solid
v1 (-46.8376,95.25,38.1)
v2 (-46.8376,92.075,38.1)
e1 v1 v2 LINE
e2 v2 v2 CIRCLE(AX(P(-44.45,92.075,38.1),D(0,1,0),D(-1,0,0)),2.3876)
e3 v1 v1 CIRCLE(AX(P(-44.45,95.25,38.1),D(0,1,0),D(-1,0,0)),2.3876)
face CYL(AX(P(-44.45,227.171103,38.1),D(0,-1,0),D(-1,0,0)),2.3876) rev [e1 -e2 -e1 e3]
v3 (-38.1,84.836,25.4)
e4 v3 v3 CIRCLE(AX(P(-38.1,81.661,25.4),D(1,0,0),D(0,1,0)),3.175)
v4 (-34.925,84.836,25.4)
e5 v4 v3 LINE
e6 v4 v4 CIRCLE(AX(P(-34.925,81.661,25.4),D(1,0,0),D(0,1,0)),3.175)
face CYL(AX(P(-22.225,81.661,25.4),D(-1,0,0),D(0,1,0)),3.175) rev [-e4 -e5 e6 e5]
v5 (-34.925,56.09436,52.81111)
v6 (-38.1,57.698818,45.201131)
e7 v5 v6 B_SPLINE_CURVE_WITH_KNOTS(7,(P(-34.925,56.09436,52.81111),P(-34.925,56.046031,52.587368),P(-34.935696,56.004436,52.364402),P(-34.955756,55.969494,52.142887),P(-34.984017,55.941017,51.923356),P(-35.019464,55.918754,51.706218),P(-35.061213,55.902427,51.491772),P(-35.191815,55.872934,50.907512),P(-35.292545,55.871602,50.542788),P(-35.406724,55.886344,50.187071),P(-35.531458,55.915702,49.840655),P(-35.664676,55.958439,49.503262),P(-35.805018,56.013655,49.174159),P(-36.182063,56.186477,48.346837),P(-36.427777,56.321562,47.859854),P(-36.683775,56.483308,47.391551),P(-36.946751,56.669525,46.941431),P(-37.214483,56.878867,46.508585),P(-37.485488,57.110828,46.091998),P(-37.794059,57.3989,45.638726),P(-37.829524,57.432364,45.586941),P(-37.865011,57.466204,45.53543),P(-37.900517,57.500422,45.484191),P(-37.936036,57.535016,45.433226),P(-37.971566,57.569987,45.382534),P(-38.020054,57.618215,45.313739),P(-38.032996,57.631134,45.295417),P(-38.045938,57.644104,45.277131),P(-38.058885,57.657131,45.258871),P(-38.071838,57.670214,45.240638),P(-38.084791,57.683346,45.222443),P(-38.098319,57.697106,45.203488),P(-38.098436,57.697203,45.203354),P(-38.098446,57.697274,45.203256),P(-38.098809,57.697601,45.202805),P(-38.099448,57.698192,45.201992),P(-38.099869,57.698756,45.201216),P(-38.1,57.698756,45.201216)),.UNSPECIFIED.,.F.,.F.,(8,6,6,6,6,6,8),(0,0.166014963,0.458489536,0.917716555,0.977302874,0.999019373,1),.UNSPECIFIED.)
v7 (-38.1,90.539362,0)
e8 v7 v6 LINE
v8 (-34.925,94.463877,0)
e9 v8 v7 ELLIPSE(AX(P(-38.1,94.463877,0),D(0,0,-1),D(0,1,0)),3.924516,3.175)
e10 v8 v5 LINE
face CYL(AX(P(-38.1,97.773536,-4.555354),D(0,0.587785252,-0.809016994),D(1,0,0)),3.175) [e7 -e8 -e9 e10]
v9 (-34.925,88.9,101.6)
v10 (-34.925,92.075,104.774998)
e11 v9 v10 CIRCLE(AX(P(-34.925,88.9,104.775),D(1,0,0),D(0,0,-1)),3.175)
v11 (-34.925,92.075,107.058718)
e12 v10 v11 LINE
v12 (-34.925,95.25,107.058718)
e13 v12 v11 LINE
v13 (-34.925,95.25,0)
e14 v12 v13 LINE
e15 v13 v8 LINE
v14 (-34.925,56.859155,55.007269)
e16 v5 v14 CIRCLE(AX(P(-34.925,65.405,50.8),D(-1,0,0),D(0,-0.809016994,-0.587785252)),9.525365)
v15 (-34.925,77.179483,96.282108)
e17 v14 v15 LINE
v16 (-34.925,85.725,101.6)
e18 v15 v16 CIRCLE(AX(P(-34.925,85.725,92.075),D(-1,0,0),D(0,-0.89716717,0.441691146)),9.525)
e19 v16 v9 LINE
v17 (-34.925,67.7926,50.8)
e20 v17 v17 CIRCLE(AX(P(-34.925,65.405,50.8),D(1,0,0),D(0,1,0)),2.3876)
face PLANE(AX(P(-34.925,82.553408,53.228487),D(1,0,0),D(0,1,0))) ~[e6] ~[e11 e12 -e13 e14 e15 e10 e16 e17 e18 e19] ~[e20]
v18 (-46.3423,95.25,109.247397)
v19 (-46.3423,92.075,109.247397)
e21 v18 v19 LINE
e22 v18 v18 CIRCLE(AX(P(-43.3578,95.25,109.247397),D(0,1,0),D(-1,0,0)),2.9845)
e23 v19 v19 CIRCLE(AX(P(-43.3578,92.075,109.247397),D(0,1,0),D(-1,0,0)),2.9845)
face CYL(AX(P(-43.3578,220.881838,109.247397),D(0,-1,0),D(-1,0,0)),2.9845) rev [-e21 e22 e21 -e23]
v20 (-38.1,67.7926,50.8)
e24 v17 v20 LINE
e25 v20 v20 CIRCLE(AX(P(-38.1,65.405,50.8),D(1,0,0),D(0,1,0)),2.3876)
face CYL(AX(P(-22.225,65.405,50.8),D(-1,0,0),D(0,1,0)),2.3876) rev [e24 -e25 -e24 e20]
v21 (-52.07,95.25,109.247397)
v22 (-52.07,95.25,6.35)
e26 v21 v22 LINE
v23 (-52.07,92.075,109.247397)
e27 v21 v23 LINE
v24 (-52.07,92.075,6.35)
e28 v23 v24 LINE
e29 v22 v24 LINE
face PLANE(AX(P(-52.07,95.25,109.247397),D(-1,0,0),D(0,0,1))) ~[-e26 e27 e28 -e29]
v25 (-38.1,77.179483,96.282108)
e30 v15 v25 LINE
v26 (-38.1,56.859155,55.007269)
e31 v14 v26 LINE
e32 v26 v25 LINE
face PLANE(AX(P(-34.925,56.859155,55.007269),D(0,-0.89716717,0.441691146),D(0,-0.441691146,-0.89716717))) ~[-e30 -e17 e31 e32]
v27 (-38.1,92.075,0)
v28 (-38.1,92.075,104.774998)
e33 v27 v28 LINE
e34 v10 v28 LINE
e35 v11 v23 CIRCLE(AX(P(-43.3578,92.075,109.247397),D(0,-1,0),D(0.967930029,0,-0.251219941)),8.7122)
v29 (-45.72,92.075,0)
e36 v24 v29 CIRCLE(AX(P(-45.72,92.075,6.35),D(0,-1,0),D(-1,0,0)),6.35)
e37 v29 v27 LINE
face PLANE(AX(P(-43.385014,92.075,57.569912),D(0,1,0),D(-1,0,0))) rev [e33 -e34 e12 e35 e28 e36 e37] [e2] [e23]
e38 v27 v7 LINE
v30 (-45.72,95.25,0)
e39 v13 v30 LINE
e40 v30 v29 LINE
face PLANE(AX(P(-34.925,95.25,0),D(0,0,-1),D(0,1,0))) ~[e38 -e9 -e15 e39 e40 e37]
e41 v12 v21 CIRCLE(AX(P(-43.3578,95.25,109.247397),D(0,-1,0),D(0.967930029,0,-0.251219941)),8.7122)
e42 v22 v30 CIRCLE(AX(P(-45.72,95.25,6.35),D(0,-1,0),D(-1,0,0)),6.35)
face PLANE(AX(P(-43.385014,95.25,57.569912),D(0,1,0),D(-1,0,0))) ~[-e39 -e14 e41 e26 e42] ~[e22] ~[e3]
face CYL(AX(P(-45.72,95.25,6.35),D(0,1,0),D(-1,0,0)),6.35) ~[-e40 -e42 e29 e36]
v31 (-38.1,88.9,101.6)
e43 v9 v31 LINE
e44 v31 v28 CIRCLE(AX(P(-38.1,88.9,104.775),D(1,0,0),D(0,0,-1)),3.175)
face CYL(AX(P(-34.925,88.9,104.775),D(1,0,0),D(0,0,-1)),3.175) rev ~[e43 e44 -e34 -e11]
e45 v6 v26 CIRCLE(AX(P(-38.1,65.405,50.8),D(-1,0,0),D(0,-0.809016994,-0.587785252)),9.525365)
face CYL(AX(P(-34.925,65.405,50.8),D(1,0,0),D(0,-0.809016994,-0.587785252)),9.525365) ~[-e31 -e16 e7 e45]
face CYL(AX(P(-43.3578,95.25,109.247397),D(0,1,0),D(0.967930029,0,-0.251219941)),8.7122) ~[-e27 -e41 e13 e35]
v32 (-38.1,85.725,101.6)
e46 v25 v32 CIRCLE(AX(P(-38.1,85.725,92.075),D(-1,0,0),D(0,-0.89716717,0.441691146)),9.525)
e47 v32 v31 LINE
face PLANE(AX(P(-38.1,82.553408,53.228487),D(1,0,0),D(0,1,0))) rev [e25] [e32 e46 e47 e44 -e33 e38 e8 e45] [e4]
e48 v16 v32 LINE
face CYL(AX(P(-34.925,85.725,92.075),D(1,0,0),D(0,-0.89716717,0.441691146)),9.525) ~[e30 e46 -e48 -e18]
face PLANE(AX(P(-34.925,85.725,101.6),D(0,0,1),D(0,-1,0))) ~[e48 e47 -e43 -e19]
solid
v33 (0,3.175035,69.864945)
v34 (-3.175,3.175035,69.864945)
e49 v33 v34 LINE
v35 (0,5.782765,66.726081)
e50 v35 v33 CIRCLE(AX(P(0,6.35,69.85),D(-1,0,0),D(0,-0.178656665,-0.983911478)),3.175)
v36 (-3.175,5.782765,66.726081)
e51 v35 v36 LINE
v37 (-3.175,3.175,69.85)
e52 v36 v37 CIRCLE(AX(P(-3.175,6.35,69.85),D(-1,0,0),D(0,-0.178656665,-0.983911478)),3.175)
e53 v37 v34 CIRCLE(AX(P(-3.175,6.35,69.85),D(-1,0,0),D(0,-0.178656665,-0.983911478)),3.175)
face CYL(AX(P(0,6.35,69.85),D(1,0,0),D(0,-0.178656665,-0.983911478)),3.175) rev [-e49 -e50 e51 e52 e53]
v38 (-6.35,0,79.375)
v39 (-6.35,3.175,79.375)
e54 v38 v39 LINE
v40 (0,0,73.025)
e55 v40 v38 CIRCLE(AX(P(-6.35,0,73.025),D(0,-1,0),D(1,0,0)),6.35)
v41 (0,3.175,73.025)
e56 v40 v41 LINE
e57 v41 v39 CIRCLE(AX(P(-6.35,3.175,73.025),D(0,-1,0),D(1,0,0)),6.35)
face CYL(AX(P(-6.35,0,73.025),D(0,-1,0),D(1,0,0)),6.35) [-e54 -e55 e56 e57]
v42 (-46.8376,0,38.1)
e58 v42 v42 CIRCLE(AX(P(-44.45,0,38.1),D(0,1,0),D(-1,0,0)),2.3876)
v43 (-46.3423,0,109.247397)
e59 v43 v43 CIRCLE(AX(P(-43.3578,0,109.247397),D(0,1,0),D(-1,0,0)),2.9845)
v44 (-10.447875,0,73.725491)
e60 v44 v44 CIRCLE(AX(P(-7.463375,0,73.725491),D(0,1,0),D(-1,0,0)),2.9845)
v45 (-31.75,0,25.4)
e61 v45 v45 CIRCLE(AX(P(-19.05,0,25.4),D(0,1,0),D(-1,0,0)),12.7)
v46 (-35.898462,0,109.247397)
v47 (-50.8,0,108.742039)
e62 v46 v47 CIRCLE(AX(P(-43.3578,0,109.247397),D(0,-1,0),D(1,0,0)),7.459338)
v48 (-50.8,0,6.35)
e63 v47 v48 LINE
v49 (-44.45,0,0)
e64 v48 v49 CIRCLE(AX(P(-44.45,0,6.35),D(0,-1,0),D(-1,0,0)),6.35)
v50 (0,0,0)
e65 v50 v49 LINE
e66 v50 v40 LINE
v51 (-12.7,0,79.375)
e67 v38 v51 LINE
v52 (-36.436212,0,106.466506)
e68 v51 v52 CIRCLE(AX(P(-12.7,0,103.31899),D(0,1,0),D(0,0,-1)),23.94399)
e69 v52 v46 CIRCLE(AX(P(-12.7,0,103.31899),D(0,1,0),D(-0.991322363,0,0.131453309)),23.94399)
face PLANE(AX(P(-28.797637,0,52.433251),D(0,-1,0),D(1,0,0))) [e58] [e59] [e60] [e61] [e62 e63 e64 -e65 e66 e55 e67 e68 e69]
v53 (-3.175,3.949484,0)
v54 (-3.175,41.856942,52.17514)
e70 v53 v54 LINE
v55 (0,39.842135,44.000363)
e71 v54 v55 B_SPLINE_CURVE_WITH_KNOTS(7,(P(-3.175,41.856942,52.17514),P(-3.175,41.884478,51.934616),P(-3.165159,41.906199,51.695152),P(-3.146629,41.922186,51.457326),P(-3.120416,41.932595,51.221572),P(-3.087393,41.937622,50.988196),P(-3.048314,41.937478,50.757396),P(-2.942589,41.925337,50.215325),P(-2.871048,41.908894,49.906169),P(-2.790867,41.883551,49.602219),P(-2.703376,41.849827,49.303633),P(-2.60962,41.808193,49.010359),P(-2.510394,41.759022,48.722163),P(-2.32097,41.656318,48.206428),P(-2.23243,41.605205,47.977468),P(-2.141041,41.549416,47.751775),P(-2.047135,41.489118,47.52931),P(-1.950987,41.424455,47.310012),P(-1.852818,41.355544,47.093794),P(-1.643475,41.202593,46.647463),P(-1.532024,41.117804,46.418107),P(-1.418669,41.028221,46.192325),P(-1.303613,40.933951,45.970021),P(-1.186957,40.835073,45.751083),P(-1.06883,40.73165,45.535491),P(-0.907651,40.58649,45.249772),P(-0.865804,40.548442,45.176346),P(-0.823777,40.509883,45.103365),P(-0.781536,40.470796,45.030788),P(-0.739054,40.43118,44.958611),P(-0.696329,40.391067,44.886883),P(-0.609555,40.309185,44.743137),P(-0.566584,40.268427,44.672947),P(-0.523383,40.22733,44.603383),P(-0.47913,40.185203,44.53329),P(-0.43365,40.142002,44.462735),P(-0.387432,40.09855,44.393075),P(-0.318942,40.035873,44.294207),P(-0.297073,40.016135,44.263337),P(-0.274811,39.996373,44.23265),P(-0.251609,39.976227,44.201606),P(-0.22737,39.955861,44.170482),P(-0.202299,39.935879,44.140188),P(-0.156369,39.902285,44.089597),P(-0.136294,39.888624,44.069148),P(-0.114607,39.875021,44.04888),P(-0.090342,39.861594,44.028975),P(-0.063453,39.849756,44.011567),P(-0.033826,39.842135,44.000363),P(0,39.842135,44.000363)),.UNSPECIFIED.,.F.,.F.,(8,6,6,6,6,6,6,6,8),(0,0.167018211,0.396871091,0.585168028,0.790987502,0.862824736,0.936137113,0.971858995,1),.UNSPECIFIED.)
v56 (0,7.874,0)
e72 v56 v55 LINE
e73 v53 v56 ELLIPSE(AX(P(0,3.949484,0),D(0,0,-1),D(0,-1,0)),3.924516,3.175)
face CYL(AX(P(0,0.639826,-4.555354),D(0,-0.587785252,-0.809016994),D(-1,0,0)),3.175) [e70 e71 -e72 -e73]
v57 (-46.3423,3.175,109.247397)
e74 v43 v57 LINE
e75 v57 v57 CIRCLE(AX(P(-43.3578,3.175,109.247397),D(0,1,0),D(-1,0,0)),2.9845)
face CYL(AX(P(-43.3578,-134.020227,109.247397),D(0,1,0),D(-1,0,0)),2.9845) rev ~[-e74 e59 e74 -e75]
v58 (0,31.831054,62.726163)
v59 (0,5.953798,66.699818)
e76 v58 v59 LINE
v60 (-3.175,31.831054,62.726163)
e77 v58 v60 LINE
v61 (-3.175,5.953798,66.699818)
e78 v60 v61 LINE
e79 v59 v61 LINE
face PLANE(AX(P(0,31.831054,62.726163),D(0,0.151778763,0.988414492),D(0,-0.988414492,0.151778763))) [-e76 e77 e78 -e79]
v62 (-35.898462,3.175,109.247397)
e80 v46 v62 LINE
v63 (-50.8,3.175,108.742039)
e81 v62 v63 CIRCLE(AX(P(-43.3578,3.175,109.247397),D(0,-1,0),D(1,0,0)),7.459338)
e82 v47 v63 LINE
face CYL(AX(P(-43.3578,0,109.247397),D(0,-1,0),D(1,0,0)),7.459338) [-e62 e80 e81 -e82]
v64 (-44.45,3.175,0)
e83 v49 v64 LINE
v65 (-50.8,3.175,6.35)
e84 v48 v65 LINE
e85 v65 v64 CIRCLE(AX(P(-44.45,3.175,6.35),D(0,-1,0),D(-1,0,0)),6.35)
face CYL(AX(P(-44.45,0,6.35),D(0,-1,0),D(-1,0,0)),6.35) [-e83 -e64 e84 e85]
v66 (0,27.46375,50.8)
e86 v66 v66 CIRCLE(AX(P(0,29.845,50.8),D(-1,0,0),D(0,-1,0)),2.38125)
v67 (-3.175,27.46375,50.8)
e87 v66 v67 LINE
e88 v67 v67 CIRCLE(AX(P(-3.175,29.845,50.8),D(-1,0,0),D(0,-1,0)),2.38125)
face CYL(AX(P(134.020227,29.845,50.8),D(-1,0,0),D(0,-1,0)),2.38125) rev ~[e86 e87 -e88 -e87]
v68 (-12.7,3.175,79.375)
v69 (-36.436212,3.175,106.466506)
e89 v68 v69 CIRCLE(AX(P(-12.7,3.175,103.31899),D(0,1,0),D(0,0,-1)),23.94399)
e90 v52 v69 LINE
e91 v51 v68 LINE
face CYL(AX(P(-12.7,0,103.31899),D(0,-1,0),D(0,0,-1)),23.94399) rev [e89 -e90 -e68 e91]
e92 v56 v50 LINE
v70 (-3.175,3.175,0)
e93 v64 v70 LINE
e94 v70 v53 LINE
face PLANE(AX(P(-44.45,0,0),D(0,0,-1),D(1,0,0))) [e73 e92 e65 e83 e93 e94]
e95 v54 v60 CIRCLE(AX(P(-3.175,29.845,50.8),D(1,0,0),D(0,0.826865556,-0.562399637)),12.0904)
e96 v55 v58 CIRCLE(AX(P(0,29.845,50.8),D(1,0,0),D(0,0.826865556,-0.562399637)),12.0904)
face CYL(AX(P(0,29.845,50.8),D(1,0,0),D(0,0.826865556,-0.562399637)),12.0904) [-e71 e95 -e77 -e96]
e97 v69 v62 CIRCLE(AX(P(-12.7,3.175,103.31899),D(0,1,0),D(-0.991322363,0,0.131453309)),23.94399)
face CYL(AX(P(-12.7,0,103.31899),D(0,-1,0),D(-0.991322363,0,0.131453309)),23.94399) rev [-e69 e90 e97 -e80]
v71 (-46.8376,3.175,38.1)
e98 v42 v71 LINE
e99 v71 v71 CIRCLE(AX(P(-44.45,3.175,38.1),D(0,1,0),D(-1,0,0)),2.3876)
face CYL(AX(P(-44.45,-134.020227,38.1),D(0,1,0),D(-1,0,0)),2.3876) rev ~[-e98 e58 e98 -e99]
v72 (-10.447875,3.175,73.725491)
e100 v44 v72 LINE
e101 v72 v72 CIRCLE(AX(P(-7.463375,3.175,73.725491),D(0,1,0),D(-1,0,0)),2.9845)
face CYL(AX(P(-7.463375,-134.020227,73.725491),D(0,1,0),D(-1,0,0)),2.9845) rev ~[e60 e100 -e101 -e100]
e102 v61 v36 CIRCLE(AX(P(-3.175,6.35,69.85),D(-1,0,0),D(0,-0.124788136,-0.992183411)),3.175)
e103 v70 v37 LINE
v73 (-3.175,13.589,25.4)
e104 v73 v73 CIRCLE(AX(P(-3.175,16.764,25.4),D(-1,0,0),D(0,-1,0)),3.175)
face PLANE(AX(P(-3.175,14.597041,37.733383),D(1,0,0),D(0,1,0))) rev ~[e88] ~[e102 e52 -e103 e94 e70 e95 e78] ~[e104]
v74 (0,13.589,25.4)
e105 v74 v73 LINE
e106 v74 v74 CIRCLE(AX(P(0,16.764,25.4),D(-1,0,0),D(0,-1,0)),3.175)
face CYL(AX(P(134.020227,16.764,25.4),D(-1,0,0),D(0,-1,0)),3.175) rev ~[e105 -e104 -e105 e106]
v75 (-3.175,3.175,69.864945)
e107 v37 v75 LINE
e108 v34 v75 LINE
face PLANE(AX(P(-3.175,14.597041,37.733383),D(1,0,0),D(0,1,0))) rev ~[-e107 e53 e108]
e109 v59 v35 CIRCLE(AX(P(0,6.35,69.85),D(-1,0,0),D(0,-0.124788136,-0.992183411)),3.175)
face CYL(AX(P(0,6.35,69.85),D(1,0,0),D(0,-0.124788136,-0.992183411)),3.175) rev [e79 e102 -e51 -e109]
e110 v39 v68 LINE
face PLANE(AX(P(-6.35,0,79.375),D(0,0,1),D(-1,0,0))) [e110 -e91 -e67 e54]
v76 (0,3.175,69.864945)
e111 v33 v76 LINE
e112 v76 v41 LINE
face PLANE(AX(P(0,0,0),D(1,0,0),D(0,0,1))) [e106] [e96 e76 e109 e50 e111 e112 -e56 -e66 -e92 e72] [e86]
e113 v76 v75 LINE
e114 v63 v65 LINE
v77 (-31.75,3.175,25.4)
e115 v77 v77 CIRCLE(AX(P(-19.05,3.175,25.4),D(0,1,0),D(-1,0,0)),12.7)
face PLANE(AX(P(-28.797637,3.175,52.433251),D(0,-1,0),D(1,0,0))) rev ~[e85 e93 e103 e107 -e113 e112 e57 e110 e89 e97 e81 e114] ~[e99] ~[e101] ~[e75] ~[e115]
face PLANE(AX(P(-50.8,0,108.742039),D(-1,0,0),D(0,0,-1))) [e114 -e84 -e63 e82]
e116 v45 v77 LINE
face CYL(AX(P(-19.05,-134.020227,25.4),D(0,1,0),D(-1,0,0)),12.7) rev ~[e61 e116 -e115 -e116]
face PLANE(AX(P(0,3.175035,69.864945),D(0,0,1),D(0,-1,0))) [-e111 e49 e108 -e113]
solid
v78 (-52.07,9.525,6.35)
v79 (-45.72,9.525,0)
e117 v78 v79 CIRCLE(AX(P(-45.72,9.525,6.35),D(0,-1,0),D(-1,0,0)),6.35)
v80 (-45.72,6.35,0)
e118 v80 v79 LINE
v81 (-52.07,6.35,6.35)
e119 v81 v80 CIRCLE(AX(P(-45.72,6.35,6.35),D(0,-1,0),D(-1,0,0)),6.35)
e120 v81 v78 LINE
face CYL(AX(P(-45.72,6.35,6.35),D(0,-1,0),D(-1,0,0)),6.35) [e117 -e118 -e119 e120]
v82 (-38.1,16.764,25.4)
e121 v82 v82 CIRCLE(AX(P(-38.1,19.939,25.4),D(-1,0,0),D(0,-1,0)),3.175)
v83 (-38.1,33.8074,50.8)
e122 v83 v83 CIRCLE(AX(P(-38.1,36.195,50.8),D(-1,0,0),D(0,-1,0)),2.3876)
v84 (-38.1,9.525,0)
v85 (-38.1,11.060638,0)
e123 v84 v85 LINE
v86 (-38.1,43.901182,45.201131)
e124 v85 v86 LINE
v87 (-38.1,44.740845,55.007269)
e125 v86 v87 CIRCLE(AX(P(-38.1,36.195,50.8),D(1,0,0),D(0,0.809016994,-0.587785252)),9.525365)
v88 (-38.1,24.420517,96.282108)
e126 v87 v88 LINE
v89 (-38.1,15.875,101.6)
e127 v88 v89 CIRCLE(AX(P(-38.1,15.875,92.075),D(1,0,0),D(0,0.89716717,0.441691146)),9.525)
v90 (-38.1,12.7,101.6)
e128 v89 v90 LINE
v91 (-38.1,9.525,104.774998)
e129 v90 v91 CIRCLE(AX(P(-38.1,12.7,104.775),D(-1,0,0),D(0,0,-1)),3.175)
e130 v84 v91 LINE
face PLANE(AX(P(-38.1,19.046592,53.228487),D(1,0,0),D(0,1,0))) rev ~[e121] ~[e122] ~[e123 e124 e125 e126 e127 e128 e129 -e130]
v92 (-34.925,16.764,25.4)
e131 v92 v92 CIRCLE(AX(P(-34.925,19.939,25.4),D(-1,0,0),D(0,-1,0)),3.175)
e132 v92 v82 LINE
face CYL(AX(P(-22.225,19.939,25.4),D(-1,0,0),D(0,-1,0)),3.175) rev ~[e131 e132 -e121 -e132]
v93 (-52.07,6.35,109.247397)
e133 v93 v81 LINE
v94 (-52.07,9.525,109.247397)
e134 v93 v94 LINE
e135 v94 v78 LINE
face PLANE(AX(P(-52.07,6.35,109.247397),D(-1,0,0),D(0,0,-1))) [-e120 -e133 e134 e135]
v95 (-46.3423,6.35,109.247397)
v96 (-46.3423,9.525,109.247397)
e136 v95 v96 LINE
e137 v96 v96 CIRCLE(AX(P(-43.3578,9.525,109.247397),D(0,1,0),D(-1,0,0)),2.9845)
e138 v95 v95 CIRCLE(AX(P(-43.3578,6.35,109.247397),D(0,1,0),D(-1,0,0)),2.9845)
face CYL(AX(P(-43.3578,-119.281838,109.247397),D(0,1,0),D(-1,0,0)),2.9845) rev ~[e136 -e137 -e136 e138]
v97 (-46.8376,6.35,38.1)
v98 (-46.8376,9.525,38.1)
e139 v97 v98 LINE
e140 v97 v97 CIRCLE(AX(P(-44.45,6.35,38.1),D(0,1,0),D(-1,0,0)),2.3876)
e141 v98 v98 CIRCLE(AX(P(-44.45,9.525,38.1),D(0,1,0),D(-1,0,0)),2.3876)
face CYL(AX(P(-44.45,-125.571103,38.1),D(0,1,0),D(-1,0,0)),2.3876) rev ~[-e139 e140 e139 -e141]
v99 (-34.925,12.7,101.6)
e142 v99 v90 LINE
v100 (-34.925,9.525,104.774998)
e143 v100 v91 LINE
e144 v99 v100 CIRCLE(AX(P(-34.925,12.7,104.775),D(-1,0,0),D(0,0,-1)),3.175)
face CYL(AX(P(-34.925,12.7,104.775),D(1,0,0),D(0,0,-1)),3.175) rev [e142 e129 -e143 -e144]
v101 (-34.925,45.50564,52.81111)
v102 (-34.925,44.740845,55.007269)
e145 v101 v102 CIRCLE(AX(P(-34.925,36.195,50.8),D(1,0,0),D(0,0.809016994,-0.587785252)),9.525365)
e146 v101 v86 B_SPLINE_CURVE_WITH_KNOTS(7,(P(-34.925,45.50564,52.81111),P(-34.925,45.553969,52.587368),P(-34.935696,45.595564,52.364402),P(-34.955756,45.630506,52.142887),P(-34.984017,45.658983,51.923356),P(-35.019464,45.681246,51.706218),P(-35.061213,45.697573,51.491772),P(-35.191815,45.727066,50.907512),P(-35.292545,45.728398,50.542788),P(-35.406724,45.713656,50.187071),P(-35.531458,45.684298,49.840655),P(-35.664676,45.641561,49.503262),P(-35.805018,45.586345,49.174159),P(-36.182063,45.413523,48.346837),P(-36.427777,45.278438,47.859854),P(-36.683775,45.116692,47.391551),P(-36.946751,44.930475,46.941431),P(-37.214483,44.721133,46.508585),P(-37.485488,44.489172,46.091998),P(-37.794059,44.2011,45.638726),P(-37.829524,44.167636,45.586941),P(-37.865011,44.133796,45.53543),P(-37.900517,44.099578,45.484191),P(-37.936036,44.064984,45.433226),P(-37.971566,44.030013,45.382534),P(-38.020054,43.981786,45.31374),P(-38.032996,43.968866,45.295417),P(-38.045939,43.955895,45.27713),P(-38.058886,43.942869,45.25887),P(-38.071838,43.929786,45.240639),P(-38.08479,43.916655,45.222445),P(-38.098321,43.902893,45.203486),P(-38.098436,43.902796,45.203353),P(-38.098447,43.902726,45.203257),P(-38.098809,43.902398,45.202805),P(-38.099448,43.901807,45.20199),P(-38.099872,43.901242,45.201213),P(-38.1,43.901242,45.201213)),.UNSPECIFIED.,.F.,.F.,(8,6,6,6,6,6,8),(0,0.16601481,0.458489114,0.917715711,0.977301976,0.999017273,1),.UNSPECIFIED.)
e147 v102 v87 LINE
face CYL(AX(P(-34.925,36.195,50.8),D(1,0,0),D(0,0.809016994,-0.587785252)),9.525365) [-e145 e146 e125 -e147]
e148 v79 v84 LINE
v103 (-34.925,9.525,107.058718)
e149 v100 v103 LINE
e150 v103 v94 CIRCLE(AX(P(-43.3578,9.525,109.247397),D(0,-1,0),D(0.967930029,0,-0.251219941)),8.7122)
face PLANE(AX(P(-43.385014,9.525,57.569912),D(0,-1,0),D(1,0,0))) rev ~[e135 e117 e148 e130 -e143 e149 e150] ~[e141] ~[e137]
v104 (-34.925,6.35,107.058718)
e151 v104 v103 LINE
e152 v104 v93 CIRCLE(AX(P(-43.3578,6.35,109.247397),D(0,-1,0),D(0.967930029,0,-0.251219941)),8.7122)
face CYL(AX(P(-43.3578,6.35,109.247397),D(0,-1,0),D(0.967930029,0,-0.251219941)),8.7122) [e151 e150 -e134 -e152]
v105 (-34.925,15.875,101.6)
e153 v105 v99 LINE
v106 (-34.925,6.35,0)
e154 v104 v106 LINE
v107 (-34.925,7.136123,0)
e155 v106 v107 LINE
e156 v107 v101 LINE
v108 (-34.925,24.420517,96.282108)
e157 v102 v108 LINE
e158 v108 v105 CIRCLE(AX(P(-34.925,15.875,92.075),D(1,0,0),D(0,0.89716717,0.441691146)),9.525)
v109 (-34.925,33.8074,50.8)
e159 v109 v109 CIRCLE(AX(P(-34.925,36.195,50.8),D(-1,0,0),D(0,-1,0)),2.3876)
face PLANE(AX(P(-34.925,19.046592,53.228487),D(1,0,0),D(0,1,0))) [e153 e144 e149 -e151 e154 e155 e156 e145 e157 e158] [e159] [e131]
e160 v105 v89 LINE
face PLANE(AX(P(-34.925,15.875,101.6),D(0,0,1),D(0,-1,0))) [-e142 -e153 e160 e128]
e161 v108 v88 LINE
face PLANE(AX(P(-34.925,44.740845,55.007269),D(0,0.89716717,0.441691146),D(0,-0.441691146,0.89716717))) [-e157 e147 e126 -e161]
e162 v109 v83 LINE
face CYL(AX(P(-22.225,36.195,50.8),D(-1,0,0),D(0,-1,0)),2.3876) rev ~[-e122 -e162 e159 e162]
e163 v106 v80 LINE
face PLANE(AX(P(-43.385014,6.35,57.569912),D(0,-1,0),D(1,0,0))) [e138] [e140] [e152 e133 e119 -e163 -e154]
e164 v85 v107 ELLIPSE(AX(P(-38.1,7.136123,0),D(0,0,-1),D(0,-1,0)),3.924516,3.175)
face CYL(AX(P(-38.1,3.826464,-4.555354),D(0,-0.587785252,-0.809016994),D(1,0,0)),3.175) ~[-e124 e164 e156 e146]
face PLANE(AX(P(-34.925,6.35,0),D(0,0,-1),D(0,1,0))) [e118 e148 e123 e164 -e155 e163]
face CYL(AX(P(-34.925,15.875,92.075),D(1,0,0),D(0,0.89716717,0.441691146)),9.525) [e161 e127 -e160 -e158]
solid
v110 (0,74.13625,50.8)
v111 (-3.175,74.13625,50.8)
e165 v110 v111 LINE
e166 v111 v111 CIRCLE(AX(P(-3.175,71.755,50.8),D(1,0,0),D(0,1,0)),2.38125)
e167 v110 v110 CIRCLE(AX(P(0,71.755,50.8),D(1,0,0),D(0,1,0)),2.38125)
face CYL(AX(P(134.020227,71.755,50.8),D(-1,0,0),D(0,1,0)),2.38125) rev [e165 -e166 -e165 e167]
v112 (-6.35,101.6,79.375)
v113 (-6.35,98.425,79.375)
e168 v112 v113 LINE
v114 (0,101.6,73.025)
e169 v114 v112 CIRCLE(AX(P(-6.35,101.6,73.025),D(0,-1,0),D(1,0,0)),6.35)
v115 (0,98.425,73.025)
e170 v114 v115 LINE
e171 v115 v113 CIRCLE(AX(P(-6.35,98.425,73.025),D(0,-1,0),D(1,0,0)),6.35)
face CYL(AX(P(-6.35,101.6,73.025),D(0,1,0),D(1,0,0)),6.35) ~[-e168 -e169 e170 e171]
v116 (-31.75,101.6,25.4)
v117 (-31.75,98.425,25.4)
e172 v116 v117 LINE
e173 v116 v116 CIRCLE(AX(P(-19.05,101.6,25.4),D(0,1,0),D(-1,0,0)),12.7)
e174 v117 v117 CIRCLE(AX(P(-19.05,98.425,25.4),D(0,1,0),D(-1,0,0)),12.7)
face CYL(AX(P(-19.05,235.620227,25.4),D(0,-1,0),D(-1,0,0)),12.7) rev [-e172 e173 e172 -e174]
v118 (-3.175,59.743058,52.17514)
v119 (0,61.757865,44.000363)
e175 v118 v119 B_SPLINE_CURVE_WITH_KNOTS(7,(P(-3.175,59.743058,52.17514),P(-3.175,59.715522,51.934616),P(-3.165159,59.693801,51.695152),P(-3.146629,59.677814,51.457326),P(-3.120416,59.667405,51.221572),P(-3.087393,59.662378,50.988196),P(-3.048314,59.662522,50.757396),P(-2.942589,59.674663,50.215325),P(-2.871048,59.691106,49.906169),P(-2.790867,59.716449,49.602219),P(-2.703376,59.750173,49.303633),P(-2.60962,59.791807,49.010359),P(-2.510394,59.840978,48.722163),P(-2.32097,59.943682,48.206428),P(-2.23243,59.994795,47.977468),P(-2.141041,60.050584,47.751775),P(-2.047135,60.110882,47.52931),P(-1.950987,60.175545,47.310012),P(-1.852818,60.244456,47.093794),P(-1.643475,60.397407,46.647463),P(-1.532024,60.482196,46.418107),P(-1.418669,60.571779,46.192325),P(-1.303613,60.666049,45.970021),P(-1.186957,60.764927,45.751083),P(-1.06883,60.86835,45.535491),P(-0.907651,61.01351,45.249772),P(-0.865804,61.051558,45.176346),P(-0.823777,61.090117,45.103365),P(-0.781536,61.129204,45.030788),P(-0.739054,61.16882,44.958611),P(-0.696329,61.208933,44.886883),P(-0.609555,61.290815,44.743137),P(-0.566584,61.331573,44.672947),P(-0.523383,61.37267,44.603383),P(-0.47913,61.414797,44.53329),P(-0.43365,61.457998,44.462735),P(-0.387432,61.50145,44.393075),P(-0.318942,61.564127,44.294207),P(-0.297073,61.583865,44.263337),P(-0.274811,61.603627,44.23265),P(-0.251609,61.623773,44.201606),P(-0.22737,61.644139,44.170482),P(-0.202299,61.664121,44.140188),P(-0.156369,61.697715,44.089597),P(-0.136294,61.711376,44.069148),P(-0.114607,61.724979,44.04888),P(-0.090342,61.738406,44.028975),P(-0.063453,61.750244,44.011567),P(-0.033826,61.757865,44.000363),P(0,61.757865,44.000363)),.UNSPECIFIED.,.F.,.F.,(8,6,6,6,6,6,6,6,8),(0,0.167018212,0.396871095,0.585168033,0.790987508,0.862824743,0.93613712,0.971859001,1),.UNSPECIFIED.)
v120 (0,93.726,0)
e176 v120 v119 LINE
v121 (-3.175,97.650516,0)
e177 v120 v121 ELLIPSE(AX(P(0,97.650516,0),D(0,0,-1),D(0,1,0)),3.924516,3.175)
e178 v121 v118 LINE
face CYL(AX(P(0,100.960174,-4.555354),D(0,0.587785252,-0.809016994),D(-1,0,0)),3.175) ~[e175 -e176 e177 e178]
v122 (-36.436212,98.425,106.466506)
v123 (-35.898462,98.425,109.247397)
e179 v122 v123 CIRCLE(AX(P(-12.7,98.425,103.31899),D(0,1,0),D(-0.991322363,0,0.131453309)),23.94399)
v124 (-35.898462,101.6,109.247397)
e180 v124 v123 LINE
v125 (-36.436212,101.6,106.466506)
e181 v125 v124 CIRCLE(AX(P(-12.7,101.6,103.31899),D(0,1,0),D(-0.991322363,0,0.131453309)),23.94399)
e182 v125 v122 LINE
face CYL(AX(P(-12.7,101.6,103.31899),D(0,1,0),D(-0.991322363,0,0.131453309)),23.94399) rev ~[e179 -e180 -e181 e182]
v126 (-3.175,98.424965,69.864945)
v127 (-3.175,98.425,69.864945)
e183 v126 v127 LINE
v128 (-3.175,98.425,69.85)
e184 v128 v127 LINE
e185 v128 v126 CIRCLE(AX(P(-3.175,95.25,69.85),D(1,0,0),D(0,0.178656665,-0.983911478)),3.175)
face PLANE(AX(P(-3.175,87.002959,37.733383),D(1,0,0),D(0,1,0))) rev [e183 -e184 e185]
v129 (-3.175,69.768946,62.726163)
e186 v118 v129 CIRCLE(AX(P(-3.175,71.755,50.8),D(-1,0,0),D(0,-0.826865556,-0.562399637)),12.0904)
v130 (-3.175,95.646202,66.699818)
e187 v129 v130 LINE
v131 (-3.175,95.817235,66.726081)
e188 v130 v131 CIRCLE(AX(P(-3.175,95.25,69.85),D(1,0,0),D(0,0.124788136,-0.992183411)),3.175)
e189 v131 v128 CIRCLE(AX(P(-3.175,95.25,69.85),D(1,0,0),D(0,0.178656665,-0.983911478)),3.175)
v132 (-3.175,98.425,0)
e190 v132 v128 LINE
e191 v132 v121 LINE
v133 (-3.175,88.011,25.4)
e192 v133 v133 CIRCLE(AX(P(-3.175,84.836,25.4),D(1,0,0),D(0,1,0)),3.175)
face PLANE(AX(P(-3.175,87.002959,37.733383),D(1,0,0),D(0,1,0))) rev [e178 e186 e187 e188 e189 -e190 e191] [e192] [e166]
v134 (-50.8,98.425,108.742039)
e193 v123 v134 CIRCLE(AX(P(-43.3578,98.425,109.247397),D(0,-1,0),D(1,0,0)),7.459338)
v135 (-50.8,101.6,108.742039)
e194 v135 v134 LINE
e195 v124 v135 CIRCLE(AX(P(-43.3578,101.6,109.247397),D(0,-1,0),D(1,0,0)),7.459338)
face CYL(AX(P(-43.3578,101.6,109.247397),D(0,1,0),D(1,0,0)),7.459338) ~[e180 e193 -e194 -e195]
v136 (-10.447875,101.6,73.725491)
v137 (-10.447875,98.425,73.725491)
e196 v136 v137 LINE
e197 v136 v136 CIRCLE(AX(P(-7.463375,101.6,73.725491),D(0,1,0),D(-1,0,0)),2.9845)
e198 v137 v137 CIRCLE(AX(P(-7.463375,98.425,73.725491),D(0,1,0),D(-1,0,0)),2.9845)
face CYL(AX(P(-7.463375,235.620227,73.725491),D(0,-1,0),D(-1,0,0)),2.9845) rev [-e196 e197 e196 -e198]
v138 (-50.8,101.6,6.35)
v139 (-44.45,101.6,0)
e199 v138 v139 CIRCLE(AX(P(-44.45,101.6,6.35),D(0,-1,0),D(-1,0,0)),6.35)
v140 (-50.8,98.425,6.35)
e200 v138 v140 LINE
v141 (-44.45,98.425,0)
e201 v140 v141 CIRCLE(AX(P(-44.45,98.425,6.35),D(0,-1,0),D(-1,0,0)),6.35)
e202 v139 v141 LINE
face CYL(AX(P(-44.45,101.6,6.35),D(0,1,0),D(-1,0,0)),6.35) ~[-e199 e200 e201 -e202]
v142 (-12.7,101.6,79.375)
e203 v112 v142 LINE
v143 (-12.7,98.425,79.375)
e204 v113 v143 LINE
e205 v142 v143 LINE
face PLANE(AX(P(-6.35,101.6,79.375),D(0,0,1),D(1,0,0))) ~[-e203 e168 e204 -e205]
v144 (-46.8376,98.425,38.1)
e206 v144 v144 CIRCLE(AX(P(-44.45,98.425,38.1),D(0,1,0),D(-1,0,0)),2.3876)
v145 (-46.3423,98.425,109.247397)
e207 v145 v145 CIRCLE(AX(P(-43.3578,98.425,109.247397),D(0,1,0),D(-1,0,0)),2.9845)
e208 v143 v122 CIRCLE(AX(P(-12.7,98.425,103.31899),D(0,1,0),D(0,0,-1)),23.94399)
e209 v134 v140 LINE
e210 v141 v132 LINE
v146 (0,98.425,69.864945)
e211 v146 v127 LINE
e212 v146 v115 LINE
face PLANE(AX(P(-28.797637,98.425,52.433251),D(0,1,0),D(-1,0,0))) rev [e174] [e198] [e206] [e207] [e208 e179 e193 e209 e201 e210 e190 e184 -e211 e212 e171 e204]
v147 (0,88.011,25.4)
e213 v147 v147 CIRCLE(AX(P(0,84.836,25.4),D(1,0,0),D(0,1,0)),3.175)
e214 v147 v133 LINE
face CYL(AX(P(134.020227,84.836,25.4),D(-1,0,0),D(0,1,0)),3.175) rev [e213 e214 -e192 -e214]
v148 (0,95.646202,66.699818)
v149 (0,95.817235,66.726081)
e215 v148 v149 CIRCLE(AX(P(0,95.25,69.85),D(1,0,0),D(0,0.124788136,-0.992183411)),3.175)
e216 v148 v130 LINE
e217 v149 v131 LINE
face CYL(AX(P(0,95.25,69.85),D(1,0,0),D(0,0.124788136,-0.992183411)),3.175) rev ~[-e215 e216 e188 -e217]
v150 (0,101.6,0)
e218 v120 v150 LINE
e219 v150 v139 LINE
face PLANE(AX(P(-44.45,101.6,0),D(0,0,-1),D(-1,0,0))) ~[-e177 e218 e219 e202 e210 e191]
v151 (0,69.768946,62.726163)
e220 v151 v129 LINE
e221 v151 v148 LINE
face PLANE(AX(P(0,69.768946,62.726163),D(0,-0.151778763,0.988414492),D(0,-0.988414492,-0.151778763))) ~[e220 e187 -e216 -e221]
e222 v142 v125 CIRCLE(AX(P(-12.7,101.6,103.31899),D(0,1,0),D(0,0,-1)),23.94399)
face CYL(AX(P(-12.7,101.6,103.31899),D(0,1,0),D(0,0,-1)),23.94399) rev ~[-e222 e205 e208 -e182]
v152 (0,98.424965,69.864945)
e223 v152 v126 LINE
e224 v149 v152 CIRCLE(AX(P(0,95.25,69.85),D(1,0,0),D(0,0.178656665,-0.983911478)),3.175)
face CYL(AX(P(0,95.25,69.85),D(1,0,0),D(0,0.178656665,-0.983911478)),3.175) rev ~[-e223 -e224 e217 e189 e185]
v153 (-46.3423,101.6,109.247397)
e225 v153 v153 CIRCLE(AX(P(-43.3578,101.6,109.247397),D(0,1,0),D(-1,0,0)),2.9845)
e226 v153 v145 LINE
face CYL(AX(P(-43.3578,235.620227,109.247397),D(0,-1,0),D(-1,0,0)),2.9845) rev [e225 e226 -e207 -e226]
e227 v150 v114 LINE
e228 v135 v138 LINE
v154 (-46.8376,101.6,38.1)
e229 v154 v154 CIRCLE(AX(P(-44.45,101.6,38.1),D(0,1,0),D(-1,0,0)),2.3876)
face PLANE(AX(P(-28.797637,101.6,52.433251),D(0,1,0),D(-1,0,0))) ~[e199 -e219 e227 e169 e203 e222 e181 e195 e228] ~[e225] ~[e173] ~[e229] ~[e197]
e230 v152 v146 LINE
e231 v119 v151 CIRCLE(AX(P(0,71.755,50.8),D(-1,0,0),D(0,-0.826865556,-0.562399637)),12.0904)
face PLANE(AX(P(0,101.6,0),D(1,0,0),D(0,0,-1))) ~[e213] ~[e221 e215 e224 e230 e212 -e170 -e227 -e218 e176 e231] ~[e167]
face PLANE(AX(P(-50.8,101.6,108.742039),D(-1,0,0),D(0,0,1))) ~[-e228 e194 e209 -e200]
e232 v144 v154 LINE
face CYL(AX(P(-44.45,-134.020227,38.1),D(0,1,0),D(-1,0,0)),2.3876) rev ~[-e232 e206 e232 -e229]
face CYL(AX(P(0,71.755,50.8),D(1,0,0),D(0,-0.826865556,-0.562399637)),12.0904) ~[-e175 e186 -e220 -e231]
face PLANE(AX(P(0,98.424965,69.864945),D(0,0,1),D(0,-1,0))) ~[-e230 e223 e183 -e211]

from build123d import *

# Parameters (mm, degrees)
F0_DEPTH       = 3.175
F20_DEPTH      = 3.175
F1_D           = 25.4
F21_D          = 6.35
F22_D          = 4.7625
F2_D           = 5.969
F3_D           = 5.969
F4_DEPTH       = 25.4
F8_DEPTH       = 3.175
F9_D           = 5.969
F12_DEPTH      = 3.175
F13_D          = 4.7752
F13_DEPTH      = 12.7
F13_TIP        = 1.434614814
F14_D          = 6.35
F14_DEPTH      = 12.7
F14_TIP        = 1.9077324654
F15_D          = 4.7752
F15_2_D        = 4.7752
F15_3_D        = 4.7752
F17_T1_DEPTH   = 70.262440232
F17_2_T1_DEPTH = 70.262440232
F17_3_T1_DEPTH = 71.7466703824
F17_4_T1_DEPTH = 71.7466703824


# Not quite as in the source:
# - a fillet or chamfer that OpenCascade refuses, or shapes differently, is made with other operations: its cross-section is extruded or revolved along the edge and cut away or added
# - a feature names something its author has since deleted; it is built from what else it names


with BuildPart() as f0:
    # F18 (on Front) → F0 (new body)
    with BuildSketch(Plane.XZ):
        with BuildLine():
            Line((-44.45, 0), (-19.05, 0))
            Line((-19.05, 0), (0, 0))
            Line((0, 0), (0, 73.025))
            ThreePointArc((0, 73.025), (-1.8598719395, 77.5151280605), (-6.35, 79.375))
            Line((-6.35, 79.375), (-12.7, 79.375))
            ThreePointArc((-12.7, 79.375), (-30.7094245393, 87.5400395149), (-36.4362123554, 106.4665062699))
            ThreePointArc((-36.4362123554, 106.4665062699), (-36.2084930614, 107.8649099863), (-35.8984617385, 109.2473967348))
            ThreePointArc((-35.8984617385, 109.2473967348), (-43.6106241383, 116.7024491997), (-50.8, 108.7420389807))
            Line((-50.8, 108.7420389807), (-50.8, 6.35))
            ThreePointArc((-50.8, 6.35), (-48.9401280605, 1.8598719395), (-44.45, 0))
        make_face()
    extrude(amount=-F0_DEPTH)

    # F19 (on Right) → F20 (join)
    with BuildSketch(Plane.YZ):
        with BuildLine():
            Line((0, 69.8649448027), (0, 0))
            Line((0, 0), (7.874, 0))
            Line((7.874, 0), (39.8421352783, 44.0003634282))
            ThreePointArc((39.8421352783, 44.0003634282), (40.960893879, 55.5554888764), (31.8310538657, 62.7261629214))
            Line((31.8310538657, 62.7261629214), (5.9537976693, 66.6998176699))
            ThreePointArc((5.9537976693, 66.6998176699), (5.8681024272, 66.7117839894), (5.7827650898, 66.7260810579))
            ThreePointArc((5.7827650898, 66.7260810579), (3.907842937, 67.8210855416), (3.175035173, 69.8649448027))
            Line((3.175035173, 69.8649448027), (0, 69.8649448027))
        make_face()
    extrude(amount=-F20_DEPTH)

    # F1 (through all)
    with Locations(Plane.XZ):
        with Locations((-19.05, 25.4)):
            Hole(F1_D / 2)

    # F21 (through all)
    with Locations(Plane.YZ):
        with Locations((16.764, 25.4)):
            Hole(F21_D / 2)

    # F22 (through all)
    with Locations(Plane.YZ):
        with Locations((29.844999956, 50.8)):
            Hole(F22_D / 2)

    # F2 (through all)
    with Locations(Plane.XZ):
        with Locations((-43.3578, 109.2473967348)):
            Hole(F2_D / 2)

    # F3 (through all)
    with Locations(Plane.XZ):
        with Locations((-7.4633745437, 73.7254909395)):
            Hole(F3_D / 2)

    # F18 (on Front) → F4 (cut)
    with BuildSketch(Plane.XZ):
        with BuildLine():
            ThreePointArc((-6.35, 79.375), (-1.8598719395, 77.5151280605), (0, 73.025))
            Line((0, 73.025), (0, 79.375))
            Line((0, 79.375), (-6.35, 79.375))
        make_face()
    extrude(amount=-F4_DEPTH, mode=Mode.SUBTRACT)


with BuildPart() as f23_1:
    # F23: instance of F0
    add(f0.part.mirror(Plane.XZ.offset(-50.8)))

    # F15#2 (through all)
    with Locations(Plane.XZ):
        with Locations((-44.45, 38.1)):
            Hole(F15_2_D / 2)

    # F17#2: fillet of radius 3.175 on 1 edges, made by hand

    # F17_2_s2 → F17_2_t1 (cut)
    with BuildSketch(Plane(origin=(0, 37.0470820327, -50.990933916), x_dir=(1, 0, 0), z_dir=(0, -0.5877852523, 0.8090169944))):
        with BuildLine():
            ThreePointArc((-3.175, 79.0009268148), (-2.2450640303, 76.7558627845), (0, 75.8259268148))
            Line((0, 75.8259268148), (-3.175, 75.8259268148))
            Line((-3.175, 75.8259268148), (-3.175, 79.0009268148))
        make_face()
    extrude(amount=F17_2_T1_DEPTH, mode=Mode.SUBTRACT)


with BuildPart() as f8:
    # F7 (on offset) → F8 (new body)
    with BuildSketch(Plane.XZ.offset(-6.35)):
        with BuildLine():
            Line((-52.07, 109.2473967348), (-52.07, 6.35))
            ThreePointArc((-52.07, 6.35), (-50.2101280605, 1.8598719395), (-45.72, 0))
            Line((-45.72, 0), (-34.925, 0))
            Line((-34.925, 0), (-34.925, 107.0587183665))
            ThreePointArc((-34.925, 107.0587183665), (-42.2545800129, 117.8894644561), (-52.07, 109.2473967348))
        make_face()
    extrude(amount=-F8_DEPTH)

    # F9 (through all)
    with Locations(Plane.XZ):
        with Locations((-43.3578, 109.2473967348)):
            Hole(F9_D / 2)

    # F11 (on offset) → F12 (join)
    with BuildSketch(Plane.YZ.offset(-34.925)):
        with BuildLine():
            ThreePointArc((24.4205172977, 96.2821081653), (20.9075401005, 100.1619750301), (15.875, 101.6))
            Line((15.875, 101.6), (12.7, 101.6))
            ThreePointArc((12.7, 101.6), (10.4549368419, 102.5299350976), (9.525, 104.7749975333))
            Line((9.525, 104.7749975333), (6.3898560263, 104.7749950975))
            Line((6.3898560263, 104.7749950975), (6.35, 104.7826025007))
            Line((6.35, 104.7826025007), (6.35, 0))
            Line((6.35, 0), (11.0606384104, 0))
            Line((11.0606384104, 0), (43.9011822821, 45.2011308435))
            ThreePointArc((43.9011822821, 45.2011308435), (45.6856367243, 49.9873526203), (44.7408448962, 55.0072694478))
            Line((44.7408448962, 55.0072694478), (24.4205172977, 96.2821081653))
        make_face()
    extrude(amount=-F12_DEPTH)

    # F13
    with Locations(Plane.YZ.offset(-34.925)):
        with Locations((36.195, 50.8)):
            Hole(F13_D / 2, depth=F13_DEPTH)
            with Locations((0, 0, -(F13_DEPTH + F13_TIP / 2))):  # 118° drill point
                Cone(0, F13_D / 2, F13_TIP, mode=Mode.SUBTRACT)

    # F14
    with Locations(Plane.YZ.offset(-34.925)):
        with Locations((19.939, 25.4)):
            Hole(F14_D / 2, depth=F14_DEPTH)
            with Locations((0, 0, -(F14_DEPTH + F14_TIP / 2))):  # 118° drill point
                Cone(0, F14_D / 2, F14_TIP, mode=Mode.SUBTRACT)

    # F15#3 (through all)
    with Locations(Plane.XZ):
        with Locations((-44.45, 38.1)):
            Hole(F15_3_D / 2)


with BuildPart() as f0_1:
    add(f0.part)

    # F15 (through all)
    with Locations(Plane.XZ):
        with Locations((-44.45, 38.1)):
            Hole(F15_D / 2)

    # F17: fillet of radius 3.175 on 1 edges, made by hand

    # F17_s2 → F17_t1 (cut)
    with BuildSketch(Plane(origin=(0, -1.9451453469, -2.6772628882), x_dir=(1, 0, 0), z_dir=(0, 0.5877852523, 0.8090169944))):
        with BuildLine():
            ThreePointArc((-3.175, 3.1951998137), (-2.2450640303, 5.440263844), (0, 6.3701998137))
            Line((0, 6.3701998137), (-3.175, 6.3701998137))
            Line((-3.175, 6.3701998137), (-3.175, 3.1951998137))
        make_face()
    extrude(amount=F17_T1_DEPTH, mode=Mode.SUBTRACT)


with BuildPart() as f16_1:
    # F16: instance of F8
    add(f8.part.mirror(Plane.XZ.offset(-50.8)))

    # F17#4: fillet of radius 3.175 on 1 edges, made by hand

    # F17_4_s2 → F17_4_t1 (cut)
    with BuildSketch(Plane(origin=(0, 35.9461255394, -49.4755973034), x_dir=(1, 0, 0), z_dir=(0, -0.5877852523, 0.8090169944))):
        with BuildLine():
            ThreePointArc((-34.925, 76.4228821859), (-35.8549359697, 74.1778181556), (-38.1, 73.2478821859))
            Line((-38.1, 73.2478821859), (-34.925, 73.2478821859))
            Line((-34.925, 73.2478821859), (-34.925, 76.4228821859))
        make_face()
    extrude(amount=F17_4_T1_DEPTH, mode=Mode.SUBTRACT)


with BuildPart() as f8_1:
    add(f8.part)

    # F17#3: fillet of radius 3.175 on 1 edges, made by hand

    # F17_3_s2 → F17_3_t1 (cut)
    with BuildSketch(Plane(origin=(0, -0.8441888536, -1.1619262756), x_dir=(1, 0, 0), z_dir=(0, 0.5877852523, 0.8090169944))):
        with BuildLine():
            ThreePointArc((-34.925, 5.7732444426), (-35.8549359697, 8.0183084729), (-38.1, 8.9482444426))
            Line((-38.1, 8.9482444426), (-34.925, 8.9482444426))
            Line((-34.925, 8.9482444426), (-34.925, 5.7732444426))
        make_face()
    extrude(amount=F17_3_T1_DEPTH, mode=Mode.SUBTRACT)


solid = Compound([f23_1.part, f0_1.part, f16_1.part, f8_1.part])
